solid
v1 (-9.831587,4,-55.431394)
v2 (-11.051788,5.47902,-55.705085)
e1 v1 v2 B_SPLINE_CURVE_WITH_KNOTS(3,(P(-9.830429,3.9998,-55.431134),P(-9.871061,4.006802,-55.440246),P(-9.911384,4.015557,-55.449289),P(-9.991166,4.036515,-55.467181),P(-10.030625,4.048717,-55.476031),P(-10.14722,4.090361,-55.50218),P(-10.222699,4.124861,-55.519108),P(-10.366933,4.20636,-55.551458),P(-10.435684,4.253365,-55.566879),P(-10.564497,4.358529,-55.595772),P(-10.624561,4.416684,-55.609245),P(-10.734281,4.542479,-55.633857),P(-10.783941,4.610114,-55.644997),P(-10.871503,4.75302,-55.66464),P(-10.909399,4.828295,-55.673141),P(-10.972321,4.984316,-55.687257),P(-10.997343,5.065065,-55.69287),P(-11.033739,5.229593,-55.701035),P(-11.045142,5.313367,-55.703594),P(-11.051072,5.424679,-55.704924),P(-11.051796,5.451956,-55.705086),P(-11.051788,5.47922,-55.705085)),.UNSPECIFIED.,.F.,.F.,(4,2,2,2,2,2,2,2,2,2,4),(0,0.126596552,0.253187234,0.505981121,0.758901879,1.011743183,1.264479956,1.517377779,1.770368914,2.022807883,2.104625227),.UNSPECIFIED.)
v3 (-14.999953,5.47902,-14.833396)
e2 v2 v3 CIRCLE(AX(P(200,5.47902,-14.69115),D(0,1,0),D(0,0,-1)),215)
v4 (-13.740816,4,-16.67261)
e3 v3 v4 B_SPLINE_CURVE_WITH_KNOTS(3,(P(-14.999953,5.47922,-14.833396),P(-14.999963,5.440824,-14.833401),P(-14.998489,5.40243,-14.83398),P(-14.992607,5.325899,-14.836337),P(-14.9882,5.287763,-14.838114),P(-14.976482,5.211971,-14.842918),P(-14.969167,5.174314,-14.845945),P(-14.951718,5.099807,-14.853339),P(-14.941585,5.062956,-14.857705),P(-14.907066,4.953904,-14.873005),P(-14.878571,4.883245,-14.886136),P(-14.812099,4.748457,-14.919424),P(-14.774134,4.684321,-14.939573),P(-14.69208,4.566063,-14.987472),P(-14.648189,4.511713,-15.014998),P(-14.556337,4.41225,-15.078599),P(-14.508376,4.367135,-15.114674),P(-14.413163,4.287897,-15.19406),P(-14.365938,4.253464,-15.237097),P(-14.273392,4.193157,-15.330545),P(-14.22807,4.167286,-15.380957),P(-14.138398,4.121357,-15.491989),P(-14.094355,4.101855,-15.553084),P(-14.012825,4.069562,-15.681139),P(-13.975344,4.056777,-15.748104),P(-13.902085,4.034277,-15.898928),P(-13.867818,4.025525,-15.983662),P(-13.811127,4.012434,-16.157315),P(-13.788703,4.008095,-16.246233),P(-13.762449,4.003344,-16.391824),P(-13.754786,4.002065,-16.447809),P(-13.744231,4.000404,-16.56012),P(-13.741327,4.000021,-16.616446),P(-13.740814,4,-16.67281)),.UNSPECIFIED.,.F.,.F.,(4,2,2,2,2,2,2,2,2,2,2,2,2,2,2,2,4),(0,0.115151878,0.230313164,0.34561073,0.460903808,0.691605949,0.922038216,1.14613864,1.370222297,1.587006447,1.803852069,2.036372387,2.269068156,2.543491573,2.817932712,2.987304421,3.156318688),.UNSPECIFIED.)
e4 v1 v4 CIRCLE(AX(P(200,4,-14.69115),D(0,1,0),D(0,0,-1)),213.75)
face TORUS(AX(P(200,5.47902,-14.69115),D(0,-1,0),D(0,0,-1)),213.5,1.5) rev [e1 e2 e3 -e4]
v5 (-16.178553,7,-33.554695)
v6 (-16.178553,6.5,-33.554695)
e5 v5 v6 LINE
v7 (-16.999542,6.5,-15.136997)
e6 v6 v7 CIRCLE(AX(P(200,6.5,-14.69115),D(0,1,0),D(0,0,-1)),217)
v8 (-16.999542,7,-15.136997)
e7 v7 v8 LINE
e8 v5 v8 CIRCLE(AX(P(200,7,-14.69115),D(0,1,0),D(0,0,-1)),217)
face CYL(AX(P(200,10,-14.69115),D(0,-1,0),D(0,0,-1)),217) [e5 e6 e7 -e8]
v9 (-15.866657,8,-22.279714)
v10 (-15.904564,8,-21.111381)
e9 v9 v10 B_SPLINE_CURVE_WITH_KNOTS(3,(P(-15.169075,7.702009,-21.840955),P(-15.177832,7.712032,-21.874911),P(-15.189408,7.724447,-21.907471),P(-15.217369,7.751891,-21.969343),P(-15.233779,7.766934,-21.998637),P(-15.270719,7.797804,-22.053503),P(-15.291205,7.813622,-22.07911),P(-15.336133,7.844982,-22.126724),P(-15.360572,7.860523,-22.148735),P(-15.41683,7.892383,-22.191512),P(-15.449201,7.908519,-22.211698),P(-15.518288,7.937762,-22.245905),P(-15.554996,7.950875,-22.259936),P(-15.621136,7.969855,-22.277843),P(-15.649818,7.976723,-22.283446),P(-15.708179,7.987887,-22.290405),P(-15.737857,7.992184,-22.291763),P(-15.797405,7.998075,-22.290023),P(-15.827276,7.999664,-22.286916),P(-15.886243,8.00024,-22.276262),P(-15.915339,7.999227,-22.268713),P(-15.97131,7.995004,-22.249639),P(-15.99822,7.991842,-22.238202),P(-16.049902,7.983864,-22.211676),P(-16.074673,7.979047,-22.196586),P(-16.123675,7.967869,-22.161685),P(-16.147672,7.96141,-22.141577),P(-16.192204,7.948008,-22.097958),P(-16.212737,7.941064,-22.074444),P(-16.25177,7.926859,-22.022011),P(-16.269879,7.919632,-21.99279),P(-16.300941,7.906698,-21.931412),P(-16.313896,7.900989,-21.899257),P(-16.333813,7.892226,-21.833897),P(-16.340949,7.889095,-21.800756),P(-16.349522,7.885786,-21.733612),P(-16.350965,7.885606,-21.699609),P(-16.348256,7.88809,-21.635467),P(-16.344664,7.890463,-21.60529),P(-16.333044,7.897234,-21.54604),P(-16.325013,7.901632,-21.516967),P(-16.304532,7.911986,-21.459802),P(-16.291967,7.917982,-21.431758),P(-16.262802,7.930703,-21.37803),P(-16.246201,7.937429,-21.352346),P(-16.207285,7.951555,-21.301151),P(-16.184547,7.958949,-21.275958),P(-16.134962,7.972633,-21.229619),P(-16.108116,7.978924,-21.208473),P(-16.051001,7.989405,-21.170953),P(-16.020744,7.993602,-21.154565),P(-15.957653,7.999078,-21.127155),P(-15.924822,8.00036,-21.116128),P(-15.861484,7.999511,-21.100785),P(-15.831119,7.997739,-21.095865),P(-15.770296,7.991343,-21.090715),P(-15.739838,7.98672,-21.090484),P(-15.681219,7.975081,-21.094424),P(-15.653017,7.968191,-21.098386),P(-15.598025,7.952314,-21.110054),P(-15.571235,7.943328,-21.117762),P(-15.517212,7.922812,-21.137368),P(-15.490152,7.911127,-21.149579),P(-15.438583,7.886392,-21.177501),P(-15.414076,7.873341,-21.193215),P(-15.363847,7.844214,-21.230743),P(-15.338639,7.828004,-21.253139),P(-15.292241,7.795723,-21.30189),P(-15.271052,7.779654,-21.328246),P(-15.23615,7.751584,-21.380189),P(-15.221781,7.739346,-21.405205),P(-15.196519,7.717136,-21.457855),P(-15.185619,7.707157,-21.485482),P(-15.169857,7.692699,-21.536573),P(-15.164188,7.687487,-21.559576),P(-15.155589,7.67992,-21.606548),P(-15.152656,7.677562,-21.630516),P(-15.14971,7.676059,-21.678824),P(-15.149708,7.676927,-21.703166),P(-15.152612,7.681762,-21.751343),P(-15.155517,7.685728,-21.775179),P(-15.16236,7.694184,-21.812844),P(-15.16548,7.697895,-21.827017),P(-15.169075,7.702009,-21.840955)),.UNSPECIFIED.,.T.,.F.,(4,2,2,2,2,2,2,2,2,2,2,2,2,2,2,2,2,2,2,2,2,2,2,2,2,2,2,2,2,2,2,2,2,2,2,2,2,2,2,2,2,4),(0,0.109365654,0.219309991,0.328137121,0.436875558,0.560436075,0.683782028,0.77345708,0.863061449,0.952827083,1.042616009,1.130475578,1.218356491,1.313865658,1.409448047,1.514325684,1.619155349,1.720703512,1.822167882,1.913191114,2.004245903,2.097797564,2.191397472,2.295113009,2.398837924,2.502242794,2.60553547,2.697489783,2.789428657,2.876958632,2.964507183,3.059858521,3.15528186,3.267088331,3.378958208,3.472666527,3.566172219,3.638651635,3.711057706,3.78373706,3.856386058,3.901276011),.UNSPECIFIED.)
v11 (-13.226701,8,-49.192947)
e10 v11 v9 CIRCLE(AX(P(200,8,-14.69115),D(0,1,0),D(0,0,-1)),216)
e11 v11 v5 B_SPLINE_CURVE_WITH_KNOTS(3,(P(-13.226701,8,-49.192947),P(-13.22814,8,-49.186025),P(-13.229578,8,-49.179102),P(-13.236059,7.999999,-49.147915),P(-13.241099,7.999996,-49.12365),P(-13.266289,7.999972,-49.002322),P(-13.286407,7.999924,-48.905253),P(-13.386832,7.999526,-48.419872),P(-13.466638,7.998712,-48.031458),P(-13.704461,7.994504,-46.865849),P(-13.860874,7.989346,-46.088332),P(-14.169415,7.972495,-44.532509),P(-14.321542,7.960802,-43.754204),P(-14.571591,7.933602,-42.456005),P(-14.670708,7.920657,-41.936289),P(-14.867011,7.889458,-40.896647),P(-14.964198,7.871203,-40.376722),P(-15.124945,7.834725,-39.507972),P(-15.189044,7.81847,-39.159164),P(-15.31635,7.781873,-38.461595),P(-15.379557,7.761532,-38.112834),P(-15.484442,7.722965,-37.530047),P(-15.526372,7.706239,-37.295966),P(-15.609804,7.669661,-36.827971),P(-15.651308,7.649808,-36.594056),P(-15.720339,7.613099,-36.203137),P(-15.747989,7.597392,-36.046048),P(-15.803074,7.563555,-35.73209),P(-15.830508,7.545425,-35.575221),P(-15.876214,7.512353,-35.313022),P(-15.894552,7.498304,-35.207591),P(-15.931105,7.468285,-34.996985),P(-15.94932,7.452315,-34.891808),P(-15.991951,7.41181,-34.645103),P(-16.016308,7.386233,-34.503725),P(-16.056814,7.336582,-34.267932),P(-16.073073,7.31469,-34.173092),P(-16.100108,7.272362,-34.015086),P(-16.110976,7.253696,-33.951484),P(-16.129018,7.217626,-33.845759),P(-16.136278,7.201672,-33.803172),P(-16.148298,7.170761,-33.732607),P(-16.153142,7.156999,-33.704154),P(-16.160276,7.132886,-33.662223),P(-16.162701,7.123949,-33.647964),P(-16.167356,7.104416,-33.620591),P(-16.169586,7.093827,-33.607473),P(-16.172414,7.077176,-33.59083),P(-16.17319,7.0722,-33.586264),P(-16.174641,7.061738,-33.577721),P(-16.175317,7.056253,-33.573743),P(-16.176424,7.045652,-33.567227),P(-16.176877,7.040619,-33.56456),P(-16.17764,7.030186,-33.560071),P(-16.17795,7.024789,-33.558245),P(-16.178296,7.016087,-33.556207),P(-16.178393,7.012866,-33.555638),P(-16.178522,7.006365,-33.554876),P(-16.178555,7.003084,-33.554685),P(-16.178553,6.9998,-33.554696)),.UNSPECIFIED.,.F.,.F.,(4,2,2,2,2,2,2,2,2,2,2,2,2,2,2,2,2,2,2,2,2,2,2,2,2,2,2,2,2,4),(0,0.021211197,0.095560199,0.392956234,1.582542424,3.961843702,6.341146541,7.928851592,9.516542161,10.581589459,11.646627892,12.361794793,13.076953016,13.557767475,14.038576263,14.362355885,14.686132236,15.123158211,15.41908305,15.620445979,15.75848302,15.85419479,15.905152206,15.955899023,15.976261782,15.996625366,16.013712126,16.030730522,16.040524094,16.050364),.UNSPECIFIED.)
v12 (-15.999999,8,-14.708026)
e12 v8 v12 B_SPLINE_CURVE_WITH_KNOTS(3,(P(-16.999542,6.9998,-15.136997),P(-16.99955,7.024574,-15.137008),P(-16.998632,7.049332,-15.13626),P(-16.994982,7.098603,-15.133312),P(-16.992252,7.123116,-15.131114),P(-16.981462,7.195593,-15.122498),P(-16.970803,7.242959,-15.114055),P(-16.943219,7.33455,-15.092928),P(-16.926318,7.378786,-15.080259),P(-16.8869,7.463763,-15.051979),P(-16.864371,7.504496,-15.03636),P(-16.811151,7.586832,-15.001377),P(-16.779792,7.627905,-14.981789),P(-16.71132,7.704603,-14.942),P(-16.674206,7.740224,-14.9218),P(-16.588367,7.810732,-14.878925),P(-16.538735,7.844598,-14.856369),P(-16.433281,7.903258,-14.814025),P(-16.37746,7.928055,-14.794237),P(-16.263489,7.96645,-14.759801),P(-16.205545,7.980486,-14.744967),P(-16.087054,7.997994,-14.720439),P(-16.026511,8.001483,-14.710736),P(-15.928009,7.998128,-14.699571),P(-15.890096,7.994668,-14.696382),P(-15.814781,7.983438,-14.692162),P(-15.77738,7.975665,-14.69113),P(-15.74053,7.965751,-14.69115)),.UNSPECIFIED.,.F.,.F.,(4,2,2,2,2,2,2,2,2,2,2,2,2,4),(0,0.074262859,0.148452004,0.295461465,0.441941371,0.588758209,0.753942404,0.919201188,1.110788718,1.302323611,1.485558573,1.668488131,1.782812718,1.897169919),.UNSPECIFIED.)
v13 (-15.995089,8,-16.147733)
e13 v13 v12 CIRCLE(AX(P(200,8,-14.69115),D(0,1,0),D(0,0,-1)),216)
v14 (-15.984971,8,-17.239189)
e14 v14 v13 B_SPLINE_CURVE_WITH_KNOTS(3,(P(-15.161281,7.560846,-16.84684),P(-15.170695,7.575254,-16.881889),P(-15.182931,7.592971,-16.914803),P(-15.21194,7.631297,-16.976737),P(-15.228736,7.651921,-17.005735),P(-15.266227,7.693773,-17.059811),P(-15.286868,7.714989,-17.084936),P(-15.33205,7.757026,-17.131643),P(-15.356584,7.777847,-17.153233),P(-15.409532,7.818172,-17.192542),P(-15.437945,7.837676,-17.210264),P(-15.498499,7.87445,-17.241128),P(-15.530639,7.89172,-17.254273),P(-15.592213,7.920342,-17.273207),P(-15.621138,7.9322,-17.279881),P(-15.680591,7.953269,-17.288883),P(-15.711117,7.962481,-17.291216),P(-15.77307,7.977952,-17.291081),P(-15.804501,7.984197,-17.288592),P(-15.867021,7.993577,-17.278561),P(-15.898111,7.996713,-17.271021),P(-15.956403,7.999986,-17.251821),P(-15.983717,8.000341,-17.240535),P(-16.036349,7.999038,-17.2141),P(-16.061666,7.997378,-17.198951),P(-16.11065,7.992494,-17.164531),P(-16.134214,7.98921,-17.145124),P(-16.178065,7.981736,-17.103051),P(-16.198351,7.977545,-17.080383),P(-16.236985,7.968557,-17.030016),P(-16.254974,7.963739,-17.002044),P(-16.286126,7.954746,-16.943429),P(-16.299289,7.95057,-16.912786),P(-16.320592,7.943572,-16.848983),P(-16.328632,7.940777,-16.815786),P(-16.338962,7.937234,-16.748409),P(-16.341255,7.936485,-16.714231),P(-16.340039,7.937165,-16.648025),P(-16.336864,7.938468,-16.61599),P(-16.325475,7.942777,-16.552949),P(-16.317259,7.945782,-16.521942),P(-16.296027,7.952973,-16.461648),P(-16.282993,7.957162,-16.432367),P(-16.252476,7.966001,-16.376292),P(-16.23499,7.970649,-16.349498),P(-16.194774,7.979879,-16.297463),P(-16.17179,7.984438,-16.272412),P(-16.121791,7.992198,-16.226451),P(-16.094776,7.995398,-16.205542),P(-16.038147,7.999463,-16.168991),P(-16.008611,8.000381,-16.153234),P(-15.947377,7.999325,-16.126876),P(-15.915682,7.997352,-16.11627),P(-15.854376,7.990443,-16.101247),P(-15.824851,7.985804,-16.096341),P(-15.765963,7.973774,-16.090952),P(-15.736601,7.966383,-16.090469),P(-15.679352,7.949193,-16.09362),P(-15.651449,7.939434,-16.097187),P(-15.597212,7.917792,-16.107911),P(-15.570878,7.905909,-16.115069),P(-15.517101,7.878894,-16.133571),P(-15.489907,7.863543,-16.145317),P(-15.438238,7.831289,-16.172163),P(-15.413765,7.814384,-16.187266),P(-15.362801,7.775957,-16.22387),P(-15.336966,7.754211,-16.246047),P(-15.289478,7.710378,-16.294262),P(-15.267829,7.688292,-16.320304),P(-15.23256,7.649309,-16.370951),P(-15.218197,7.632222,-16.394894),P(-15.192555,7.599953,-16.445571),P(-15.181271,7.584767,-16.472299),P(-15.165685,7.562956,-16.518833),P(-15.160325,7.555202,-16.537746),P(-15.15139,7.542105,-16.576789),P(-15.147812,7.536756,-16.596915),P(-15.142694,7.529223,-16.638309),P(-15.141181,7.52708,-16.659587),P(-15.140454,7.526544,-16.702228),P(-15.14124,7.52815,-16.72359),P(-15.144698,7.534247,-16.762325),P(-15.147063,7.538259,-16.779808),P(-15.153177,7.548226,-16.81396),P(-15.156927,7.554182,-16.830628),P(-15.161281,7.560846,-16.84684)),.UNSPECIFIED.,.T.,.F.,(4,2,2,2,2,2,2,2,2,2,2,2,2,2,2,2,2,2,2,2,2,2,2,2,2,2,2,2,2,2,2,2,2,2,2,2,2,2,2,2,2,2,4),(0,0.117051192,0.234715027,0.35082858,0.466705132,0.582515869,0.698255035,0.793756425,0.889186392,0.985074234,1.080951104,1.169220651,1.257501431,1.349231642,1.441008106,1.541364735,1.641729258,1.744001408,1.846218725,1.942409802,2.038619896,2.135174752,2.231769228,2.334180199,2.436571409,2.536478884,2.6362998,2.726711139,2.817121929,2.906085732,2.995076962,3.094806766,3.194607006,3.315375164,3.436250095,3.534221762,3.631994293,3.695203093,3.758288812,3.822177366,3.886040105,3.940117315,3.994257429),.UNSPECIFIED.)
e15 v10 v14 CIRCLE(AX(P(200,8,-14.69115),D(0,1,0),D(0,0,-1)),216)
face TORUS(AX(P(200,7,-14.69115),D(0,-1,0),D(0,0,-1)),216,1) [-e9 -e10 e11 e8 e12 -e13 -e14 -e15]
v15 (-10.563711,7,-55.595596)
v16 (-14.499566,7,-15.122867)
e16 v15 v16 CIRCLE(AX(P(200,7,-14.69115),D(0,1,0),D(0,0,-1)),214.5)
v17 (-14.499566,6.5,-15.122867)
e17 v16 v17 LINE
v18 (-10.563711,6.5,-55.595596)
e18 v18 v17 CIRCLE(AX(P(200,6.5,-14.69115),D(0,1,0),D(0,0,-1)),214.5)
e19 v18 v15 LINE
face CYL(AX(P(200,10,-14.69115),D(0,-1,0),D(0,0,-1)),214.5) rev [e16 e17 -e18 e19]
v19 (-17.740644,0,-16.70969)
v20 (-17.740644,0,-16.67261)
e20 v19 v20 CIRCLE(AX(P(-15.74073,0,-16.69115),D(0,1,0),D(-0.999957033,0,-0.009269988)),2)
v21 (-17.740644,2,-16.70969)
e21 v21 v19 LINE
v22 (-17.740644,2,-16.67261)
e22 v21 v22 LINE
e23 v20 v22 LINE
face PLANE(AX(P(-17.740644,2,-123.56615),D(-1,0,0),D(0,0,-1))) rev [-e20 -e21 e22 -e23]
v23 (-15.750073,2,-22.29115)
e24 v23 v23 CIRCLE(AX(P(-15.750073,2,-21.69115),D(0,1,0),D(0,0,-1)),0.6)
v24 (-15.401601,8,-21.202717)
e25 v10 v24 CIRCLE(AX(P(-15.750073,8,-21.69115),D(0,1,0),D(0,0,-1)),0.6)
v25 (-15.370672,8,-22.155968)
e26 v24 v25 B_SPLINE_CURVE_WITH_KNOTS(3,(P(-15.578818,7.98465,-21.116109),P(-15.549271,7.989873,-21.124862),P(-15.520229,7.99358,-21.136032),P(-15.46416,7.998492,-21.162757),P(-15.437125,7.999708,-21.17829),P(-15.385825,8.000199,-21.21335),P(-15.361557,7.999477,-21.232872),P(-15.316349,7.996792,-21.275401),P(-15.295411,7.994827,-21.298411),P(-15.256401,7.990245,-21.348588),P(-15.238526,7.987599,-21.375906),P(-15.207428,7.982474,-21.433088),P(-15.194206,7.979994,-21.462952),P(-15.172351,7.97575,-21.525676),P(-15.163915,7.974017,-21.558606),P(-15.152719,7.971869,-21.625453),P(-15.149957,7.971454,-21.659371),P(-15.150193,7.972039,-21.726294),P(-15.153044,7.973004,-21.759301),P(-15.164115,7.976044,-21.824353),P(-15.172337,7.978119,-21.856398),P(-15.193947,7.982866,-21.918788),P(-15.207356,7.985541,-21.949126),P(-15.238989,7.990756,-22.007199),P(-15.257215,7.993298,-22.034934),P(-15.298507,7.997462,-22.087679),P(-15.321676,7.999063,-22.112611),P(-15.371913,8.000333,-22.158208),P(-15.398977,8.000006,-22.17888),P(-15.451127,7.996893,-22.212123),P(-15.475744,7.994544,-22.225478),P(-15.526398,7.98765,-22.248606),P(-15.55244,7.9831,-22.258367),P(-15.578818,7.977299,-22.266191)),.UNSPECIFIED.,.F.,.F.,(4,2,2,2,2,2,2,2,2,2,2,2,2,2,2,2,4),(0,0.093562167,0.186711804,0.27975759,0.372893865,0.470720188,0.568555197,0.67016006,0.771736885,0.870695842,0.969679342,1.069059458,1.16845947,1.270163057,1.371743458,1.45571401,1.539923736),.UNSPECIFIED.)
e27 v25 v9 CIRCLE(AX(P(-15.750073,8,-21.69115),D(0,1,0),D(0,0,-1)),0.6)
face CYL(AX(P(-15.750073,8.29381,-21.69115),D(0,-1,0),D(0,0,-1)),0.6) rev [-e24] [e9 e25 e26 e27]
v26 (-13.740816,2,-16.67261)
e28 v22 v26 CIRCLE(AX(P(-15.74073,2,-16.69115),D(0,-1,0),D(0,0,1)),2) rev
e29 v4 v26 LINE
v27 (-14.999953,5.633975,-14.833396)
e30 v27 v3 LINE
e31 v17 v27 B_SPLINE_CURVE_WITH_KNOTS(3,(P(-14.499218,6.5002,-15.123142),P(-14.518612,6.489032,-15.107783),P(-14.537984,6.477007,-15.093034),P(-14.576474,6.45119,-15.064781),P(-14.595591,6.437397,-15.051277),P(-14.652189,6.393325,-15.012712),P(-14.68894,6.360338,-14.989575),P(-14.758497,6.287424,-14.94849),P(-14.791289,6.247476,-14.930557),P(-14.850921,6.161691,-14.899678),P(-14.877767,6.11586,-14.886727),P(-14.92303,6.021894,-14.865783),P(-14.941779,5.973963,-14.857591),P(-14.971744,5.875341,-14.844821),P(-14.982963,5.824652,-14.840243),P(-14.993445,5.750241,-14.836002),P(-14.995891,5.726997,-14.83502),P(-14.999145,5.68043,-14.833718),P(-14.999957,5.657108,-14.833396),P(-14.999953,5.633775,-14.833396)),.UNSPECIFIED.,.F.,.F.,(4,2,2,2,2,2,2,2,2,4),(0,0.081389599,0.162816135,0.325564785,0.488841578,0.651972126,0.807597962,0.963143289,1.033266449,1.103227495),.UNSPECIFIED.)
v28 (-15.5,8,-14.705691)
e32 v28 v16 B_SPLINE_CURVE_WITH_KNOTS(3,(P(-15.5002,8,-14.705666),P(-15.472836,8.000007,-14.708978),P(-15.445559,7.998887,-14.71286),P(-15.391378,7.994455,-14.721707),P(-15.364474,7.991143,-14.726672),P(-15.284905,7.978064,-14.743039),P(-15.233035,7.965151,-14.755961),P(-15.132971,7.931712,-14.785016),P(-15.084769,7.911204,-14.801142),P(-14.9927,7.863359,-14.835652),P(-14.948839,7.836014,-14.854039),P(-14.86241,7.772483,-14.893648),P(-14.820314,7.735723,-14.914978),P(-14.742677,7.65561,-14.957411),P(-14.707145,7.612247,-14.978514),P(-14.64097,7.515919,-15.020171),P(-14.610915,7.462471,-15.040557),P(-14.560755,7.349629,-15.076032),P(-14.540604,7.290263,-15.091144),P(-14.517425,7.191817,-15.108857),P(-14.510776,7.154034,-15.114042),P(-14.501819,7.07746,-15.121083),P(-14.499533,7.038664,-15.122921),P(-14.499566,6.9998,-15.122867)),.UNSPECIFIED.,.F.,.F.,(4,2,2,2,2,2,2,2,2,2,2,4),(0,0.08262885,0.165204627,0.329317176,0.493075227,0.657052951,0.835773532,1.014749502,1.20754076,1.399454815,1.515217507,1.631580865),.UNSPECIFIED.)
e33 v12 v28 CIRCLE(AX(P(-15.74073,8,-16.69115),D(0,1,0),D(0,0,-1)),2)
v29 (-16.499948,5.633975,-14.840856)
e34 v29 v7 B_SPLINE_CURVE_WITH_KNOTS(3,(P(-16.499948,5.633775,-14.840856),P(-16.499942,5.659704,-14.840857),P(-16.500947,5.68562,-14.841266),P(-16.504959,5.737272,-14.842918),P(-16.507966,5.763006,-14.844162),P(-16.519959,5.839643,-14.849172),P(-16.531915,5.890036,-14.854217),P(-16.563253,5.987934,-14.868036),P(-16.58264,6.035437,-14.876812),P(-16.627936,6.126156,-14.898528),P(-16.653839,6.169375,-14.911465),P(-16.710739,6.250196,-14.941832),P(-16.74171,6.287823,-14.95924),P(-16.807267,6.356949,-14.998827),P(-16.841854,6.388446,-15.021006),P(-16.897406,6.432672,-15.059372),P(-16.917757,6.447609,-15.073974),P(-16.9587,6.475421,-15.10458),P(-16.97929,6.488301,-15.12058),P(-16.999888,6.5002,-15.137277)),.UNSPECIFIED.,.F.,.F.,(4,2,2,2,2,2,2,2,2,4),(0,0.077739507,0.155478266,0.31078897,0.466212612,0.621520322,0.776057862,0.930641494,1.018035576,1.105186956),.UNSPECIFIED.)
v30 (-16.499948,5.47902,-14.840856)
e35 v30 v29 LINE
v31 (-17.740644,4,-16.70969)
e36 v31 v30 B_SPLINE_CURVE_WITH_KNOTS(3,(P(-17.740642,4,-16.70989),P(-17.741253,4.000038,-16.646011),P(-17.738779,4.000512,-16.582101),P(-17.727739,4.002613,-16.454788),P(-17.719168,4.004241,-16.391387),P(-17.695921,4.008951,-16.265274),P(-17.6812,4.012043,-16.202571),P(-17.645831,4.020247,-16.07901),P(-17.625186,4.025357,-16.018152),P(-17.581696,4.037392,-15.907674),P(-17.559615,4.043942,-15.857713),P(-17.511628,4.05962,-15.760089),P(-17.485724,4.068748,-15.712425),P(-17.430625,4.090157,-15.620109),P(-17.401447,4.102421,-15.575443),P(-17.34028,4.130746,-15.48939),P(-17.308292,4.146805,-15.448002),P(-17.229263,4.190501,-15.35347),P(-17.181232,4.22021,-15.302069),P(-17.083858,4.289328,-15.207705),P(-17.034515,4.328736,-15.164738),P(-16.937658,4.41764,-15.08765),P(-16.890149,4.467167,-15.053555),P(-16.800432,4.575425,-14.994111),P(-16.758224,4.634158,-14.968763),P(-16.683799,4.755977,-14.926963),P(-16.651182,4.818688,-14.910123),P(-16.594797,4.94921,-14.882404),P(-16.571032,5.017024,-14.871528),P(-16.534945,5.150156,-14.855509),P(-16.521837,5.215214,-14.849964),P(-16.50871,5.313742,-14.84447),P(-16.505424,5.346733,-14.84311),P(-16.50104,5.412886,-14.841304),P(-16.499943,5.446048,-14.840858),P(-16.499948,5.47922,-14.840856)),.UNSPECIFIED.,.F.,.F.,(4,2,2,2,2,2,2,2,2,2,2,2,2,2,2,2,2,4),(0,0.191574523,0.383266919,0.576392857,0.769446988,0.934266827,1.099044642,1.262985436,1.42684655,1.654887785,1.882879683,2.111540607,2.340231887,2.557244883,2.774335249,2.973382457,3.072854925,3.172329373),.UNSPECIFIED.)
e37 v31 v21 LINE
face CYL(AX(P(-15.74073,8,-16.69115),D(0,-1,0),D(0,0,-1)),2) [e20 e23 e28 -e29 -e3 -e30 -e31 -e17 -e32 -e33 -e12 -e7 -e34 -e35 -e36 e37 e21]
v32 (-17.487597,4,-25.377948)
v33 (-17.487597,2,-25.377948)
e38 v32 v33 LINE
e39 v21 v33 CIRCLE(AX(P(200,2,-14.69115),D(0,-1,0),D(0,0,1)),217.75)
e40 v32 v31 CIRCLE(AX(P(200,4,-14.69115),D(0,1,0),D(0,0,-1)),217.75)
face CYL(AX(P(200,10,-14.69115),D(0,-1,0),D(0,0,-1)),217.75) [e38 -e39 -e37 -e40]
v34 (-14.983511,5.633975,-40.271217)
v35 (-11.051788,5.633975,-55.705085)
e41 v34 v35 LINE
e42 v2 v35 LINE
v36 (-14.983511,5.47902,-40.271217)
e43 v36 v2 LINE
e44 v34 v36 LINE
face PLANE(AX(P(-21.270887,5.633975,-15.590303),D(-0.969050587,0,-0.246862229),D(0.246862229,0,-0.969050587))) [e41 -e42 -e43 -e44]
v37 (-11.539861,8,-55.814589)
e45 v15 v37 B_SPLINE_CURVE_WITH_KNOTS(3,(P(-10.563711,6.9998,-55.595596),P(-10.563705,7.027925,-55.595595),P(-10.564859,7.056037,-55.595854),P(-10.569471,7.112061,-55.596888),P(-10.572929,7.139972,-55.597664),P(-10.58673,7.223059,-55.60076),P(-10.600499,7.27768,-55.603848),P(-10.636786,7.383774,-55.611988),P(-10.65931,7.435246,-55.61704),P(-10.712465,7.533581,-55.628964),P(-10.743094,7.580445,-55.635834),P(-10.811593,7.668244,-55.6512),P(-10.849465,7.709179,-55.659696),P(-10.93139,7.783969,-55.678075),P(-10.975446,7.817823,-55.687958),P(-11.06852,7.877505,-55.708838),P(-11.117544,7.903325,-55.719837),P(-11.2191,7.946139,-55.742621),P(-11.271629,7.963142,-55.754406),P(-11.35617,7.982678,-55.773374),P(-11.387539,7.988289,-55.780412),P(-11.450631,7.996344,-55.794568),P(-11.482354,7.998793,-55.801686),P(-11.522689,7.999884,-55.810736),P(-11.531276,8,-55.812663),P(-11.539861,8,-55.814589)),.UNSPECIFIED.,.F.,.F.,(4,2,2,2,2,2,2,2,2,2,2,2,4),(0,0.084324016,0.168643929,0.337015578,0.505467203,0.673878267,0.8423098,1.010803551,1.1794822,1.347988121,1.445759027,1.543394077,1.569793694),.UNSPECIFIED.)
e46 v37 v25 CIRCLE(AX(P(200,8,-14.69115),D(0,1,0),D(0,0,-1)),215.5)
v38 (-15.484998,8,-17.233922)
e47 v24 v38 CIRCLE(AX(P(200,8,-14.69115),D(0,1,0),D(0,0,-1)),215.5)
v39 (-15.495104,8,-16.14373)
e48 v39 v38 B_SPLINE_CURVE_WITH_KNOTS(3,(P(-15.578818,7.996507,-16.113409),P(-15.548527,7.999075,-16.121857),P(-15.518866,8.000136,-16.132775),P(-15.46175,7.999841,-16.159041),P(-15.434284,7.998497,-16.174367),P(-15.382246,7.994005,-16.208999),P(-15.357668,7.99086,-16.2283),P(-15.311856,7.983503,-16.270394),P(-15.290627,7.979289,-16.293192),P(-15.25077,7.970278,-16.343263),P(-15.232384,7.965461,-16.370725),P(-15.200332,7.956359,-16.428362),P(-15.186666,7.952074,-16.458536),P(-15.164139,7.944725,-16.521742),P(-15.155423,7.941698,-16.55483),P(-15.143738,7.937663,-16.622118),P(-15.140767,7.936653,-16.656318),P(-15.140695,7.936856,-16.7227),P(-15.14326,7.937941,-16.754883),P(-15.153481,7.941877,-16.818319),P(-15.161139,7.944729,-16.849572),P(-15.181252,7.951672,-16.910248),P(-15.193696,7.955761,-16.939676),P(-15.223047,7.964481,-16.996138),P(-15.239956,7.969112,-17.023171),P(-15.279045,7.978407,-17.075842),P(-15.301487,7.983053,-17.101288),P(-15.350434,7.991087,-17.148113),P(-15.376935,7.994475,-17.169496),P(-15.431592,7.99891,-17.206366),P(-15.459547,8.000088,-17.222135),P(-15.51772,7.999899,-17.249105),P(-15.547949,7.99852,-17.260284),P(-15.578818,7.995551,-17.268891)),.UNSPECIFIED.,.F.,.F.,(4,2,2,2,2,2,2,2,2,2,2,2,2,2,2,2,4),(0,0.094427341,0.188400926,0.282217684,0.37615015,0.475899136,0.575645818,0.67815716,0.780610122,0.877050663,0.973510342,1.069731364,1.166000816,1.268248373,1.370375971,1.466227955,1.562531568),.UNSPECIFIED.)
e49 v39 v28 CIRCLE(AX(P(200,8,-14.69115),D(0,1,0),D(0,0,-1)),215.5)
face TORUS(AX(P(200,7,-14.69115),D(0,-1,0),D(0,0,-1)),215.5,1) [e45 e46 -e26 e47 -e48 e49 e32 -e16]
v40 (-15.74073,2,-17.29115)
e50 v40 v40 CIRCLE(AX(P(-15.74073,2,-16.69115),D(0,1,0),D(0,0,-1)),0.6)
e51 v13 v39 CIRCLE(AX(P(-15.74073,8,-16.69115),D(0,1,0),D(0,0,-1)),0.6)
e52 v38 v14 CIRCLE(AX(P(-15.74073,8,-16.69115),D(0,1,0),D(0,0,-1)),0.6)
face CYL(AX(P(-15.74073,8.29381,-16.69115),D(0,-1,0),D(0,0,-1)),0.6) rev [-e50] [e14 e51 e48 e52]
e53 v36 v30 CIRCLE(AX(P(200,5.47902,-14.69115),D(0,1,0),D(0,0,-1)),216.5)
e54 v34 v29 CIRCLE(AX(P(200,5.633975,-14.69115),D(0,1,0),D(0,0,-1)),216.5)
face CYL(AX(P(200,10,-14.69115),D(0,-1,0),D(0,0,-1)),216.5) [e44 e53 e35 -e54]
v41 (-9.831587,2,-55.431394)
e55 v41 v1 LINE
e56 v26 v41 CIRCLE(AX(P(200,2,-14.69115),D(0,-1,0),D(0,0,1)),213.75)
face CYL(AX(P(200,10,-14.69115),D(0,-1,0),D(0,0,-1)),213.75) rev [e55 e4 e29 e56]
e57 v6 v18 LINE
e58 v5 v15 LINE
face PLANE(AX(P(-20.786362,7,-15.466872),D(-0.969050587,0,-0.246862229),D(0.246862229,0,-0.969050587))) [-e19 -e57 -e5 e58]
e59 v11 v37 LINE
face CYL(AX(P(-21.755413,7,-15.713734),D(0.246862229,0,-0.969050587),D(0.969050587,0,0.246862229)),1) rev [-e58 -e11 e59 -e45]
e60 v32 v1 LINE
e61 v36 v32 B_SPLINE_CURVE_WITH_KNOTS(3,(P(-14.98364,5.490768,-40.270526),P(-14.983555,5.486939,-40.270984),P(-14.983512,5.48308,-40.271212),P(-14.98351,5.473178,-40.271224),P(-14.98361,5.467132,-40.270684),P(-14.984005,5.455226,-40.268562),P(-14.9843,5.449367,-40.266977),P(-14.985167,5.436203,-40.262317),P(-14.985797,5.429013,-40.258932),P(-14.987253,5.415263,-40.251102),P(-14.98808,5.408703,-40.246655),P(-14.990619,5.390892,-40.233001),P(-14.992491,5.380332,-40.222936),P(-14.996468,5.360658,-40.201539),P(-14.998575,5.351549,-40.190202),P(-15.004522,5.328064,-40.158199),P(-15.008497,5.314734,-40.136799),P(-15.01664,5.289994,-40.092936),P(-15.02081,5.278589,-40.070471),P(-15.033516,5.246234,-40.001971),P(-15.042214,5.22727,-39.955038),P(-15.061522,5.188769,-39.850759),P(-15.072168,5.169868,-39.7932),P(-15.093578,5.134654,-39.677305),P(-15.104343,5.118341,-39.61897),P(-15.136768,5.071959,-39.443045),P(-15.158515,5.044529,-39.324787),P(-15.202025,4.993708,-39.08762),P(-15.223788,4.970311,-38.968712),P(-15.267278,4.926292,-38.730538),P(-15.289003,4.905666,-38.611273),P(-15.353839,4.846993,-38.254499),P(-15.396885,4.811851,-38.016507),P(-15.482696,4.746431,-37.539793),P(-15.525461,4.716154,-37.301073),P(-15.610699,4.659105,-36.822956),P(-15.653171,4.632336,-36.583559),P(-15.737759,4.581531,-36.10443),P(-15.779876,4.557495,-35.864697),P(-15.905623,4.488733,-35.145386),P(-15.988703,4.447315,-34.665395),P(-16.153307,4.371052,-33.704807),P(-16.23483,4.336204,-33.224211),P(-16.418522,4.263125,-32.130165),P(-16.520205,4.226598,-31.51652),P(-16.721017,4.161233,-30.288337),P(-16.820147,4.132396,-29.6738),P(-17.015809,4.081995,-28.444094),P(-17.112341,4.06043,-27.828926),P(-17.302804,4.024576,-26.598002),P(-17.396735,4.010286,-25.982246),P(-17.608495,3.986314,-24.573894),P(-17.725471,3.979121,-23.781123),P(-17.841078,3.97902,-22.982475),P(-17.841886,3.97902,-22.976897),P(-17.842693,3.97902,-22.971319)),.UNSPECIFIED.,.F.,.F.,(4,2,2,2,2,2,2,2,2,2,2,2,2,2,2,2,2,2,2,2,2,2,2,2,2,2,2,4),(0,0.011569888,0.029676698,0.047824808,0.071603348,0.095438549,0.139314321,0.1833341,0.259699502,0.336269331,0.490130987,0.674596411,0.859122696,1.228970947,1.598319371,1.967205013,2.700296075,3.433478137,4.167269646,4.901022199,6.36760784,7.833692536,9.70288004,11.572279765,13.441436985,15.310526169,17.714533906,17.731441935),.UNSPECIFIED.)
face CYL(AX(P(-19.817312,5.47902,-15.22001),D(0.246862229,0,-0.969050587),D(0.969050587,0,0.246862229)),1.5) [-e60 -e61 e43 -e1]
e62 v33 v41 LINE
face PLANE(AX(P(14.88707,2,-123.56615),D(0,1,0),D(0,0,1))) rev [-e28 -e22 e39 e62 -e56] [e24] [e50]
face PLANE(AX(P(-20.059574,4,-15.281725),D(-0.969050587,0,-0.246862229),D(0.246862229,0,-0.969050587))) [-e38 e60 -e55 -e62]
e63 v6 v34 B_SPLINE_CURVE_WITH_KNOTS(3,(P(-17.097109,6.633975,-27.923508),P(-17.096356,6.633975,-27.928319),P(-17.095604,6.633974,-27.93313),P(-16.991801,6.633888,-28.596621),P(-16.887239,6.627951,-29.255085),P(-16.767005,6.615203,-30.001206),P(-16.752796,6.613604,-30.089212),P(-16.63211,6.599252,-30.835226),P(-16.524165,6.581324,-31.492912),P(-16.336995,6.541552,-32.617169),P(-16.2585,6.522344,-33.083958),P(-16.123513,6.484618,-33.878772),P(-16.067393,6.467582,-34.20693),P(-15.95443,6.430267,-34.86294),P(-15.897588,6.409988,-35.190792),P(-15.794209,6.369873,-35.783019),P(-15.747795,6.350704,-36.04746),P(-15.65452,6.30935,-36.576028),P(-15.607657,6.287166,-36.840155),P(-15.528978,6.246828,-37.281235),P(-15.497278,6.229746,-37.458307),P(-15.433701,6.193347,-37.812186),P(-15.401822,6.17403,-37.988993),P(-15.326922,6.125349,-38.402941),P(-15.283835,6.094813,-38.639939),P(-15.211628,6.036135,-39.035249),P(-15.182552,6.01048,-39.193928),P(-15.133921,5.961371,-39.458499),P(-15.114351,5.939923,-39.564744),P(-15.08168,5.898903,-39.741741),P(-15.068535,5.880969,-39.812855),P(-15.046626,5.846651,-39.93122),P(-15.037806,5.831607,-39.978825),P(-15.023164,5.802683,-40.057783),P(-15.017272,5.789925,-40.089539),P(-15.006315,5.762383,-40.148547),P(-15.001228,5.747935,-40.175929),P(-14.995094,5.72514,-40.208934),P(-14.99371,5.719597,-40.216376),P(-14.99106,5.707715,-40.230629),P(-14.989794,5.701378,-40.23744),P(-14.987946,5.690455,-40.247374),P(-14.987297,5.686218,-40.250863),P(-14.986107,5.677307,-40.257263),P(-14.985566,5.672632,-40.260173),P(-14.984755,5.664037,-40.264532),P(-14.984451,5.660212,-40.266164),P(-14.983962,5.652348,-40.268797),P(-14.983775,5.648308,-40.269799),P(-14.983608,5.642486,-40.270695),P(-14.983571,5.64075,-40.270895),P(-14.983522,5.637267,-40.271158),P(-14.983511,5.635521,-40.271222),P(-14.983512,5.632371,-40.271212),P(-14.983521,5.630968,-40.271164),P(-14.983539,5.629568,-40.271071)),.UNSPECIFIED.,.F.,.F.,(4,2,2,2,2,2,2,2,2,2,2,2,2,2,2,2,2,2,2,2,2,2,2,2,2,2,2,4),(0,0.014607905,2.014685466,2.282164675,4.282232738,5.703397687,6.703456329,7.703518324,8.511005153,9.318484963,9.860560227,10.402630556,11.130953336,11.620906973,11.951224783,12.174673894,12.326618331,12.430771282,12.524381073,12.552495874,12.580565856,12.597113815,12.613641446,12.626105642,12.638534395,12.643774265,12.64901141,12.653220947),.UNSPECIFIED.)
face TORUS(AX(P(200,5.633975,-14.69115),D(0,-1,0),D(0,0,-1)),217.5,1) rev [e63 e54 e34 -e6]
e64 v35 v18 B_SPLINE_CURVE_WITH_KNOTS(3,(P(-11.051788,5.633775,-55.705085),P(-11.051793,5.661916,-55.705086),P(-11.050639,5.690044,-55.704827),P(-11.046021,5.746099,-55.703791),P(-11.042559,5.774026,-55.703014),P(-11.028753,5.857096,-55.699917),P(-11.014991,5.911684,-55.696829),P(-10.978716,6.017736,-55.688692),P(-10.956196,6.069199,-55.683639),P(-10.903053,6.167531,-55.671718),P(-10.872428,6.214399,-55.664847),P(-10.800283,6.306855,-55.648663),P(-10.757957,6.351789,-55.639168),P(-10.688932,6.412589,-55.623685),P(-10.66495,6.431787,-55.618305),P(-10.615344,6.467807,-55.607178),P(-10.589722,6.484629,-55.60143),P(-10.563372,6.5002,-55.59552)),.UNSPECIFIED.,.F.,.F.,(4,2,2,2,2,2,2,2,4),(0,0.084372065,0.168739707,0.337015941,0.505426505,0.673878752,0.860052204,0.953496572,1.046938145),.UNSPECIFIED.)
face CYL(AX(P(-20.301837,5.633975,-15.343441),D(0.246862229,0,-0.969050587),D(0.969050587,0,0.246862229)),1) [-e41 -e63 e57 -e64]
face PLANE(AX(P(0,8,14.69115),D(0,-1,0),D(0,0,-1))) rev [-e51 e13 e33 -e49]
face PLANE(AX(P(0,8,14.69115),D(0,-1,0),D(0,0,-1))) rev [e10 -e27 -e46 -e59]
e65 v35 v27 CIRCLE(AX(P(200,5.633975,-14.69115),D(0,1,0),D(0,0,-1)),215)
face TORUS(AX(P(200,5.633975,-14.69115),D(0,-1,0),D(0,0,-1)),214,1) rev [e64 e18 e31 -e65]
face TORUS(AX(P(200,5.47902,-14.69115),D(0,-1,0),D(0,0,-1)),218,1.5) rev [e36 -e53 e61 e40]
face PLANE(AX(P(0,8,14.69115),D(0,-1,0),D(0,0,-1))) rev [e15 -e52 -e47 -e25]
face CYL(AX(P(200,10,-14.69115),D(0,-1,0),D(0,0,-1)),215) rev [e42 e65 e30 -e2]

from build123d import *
from OCP.BRepAlgoAPI import BRepAlgoAPI_Cut
from OCP.TopTools import TopTools_ListOfShape

# Parameters (mm, degrees)
SKETCH_1_W                = 4
SKETCH_1_H                = 21.3823
SKETCH_1_H_2              = 8
EXTRUDE_1_DEPTH           = 4
SKETCH_1_7_W              = 44.5
SKETCH_1_7_H              = 8
EXTRUDE_2_DEPTH           = 3.5
SKETCH_2_W                = 18.5
SKETCH_2_H                = 1.5
CUT_EXTRUDE_1_DEPTH       = 38.072659107
SKETCH_2_3_W              = 2.5
SKETCH_2_3_H              = 1.5
EXTRUDE_4_DEPTH           = 29.3823
FILLET_1_R                = 1
FILLET_2_R                = 1.5
FILLET_3_R                = 1
REVOLVE_2_ANGLE           = 30
CUT_EXTRUDE_5_DEPTH       = 112.412872349
CUT_EXTRUDE_START         = -9
CUT_EXTRUDE_6_DEPTH       = 10
SKETCH_9_W                = 32.627713819
SKETCH_9_H                = 2
CUT_EXTRUDE_7_DEPTH       = 126.089275919
CUT_EXTRUDE_8_DEPTH       = 126.089275919
CUT_EXTRUDE_START_2       = -49.267691206
CUT_EXTRUDE_9_DEPTH       = 49.267691206
SKETCH_16_R               = 0.6
CUT_EXTRUDE_10_DEPTH      = 69.120571654
SKETCH_18_R               = 0.6
CUT_EXTRUDE_11_DEPTH      = 69.120571654
CUT_EXTRUDE_12_DEPTH      = 69.325780514
CUT_EXTRUDE_13_DEPTH      = 65.449078785
CUT_EXTRUDE_14_DEPTH      = 45.022808236
CUT_EXTRUDE_14_DEPTH_BACK = 45.022808236
SKETCH_21_W               = 59.665391343
SKETCH_21_H               = 19.859042977
CUT_EXTRUDE_15_DEPTH      = 60.110082836


with BuildPart() as part:
    # 草图1 → 凸台-拉伸1 (new body)
    with BuildSketch(Plane(origin=(0, 0, 0), x_dir=(1, 0, 0), z_dir=(0, 1, 0))):
        with Locations((-15.75, -4)):
            Rectangle(SKETCH_1_W, SKETCH_1_H)
        with Locations((15.75, -4)):
            Rectangle(SKETCH_1_W, SKETCH_1_H)
        with Locations((15.75, 10.69115)):
            Rectangle(SKETCH_1_W, SKETCH_1_H_2)
        with Locations((-15.75, 10.69115)):
            Rectangle(SKETCH_1_W, SKETCH_1_H_2)
    extrude(amount=EXTRUDE_1_DEPTH)

    # 草图1<7> → 凸台-拉伸2 (add)
    with BuildSketch(Plane(origin=(0, 0, 0), x_dir=(1, 0, 0), z_dir=(0, 1, 0))):
        with Locations((0, 10.69115)):
            Rectangle(SKETCH_1_7_W, SKETCH_1_7_H)
    extrude(amount=EXTRUDE_2_DEPTH)

    # 草图2 → 切除-拉伸1 (cut, through all)
    with BuildSketch(Plane(origin=(0, 0, -14.69115), x_dir=(-1, 0, 0), z_dir=(0, 0, -1))):
        with Locations((0, 2.75)):
            Rectangle(SKETCH_2_W, SKETCH_2_H)
        Polygon((13.25, 3.5), (9.25, 3.5), (9.25, 2), align=None)
        Polygon((-9.25, 3.5), (-13.25, 3.5), (-9.25, 2), align=None)
        Polygon((-22.25, 3.5), (-22.25, 2), (-18.25, 3.5), align=None)
        Polygon((22.25, 3.5), (18.25, 3.5), (22.25, 2), align=None)
    extrude(amount=-CUT_EXTRUDE_1_DEPTH, mode=Mode.SUBTRACT)

    # 草图2<3> → 凸台-拉伸4 (add, through all)
    with BuildSketch(Plane(origin=(0, 0, -14.69115), x_dir=(-1, 0, 0), z_dir=(0, 0, -1))):
        with Locations((-15.75, 7.25)):
            Rectangle(SKETCH_2_3_W, SKETCH_2_3_H)
        Polygon((-15, 6.5), (-16.5, 6.5), (-16.5, 4), (-15.75, 4), (-15, 4), align=None)
        with Locations((15.75, 7.25)):
            Rectangle(SKETCH_2_3_W, SKETCH_2_3_H)
        Polygon((16.5, 6.5), (15, 6.5), (15, 4), (15.75, 4), (16.5, 4), align=None)
    extrude(amount=-EXTRUDE_4_DEPTH)

    # 圆角1
    # the kernel refuses this fillet: 1 mm, written as the material it adds along each edge
    with BuildSketch(Plane(origin=(-16.5, 6.5, -14.69115), x_dir=(-1, 0, 0), z_dir=(0, 0, 1)), Plane(origin=(15, 6.5, -14.69115), x_dir=(-1, 0, 0), z_dir=(0, 0, 1))) as fillet_1_piece_1:
        with BuildLine():
            CenterArc((1, 0.866025404), FILLET_1_R, 180, 60)
            Line((0, 0.866025404), (-0.02, 0.866025404))
            Line((-0.02, 0.866025404), (-0.02, 0))
            Line((-0.02, 0), (0, -0.02))
            ThreePointArc((0, -0.02), (0.25, -0.02), (0.49, -0.017320508))
            Line((0.49, -0.017320508), (0.5, 0))
        make_face()
    extrude(amount=29.3823)
    with BuildSketch(Plane(origin=(-15, 6.5, -14.69115), x_dir=(0, -1, 0), z_dir=(0, 0, 1)), Plane(origin=(16.5, 6.5, -14.69115), x_dir=(0, -1, 0), z_dir=(0, 0, 1))) as fillet_1_piece_2:
        with BuildLine():
            CenterArc((0.866025404, 1), FILLET_1_R, 210, 60)
            Line((0, 0.5), (-0.017320508, 0.49))
            ThreePointArc((-0.017320508, 0.49), (-0.02, 0.25), (-0.02, 0))
            Line((-0.02, 0), (0, -0.02))
            Line((0, -0.02), (0.866025404, -0.02))
            Line((0.866025404, -0.02), (0.866025404, 0))
        make_face()
    extrude(amount=29.3823)

    # 圆角2
    # the kernel refuses this fillet: 1.5 mm, written as the material it adds along each edge
    with BuildSketch(Plane(origin=(16.5, 4, -14.69115), x_dir=(1, 0, 0), z_dir=(0, 0, 1))) as fillet_2_piece_1:
        with BuildLine():
            CenterArc((1.5, 1.479019946), FILLET_2_R, 180, 80.405931773)
            Line((0, 1.479019946), (-0.03, 1.479019946))
            Line((-0.03, 1.479019946), (-0.03, 0))
            Line((-0.03, 0), (0, -0.03))
            ThreePointArc((0, -0.03), (0.625, -0.03), (1.245, -0.029580399))
            Line((1.245, -0.029580399), (1.25, 0))
        make_face()
    extrude(amount=29.3823)
    with BuildSketch(Plane(origin=(15, 4, -14.69115), x_dir=(0, 1, 0), z_dir=(0, 0, 1)), Plane(origin=(-16.5, 4, -14.69115), x_dir=(0, 1, 0), z_dir=(0, 0, 1))) as fillet_2_piece_2:
        with BuildLine():
            CenterArc((1.479019946, 1.5), FILLET_2_R, 189.594068227, 80.405931773)
            Line((0, 1.25), (-0.029580399, 1.245))
            ThreePointArc((-0.029580399, 1.245), (-0.03, 0.625), (-0.03, 0))
            Line((-0.03, 0), (0, -0.03))
            Line((0, -0.03), (1.479019946, -0.03))
            Line((1.479019946, -0.03), (1.479019946, 0))
        make_face()
    extrude(amount=29.3823)
    with BuildSketch(Plane(origin=(-15, 4, -14.69115), x_dir=(0, 1, 0), z_dir=(0, 0, 1))) as fillet_2_piece_3:
        with BuildLine():
            CenterArc((1.479019946, -1.5), FILLET_2_R, 90, 80.405931773)
            Line((0, -1.25), (-0.029580399, -1.245))
            ThreePointArc((-0.029580399, -1.245), (-0.03, -0.625), (-0.03, 0))
            Line((-0.03, 0), (0, 0.03))
            Line((0, 0.03), (1.479019946, 0.03))
            Line((1.479019946, 0.03), (1.479019946, 0))
        make_face()
    extrude(amount=29.3823)

    # 圆角3
    fillet_3_edges = [part.edges().sort_by_distance(p)[0] for p in [
        (14.5, 8, 0),
        (17, 8, 0),
        (-17, 8, 0),
        (-14.5, 8, 0),
    ]]
    fillet(fillet_3_edges, radius=FILLET_3_R)

    # 草图7 → 旋转2 (revolve)
    with BuildSketch(Plane(origin=(0, 0, -14.69115), x_dir=(-1, 0, 0), z_dir=(0, 0, -1))):
        with BuildLine():
            Line((-17.75, 4), (-17.75, 3.5))
            Line((-17.75, 3.5), (-17.75, 0))
            Line((-17.75, 0), (-13.75, 0))
            Line((-13.75, 0), (-13.75, 3.5))
            Line((-13.75, 3.5), (-13.75, 4))
            ThreePointArc((-13.75, 4), (-14.645643924, 4.510774109), (-15, 5.479019946))
            Line((-15, 5.479019946), (-15, 5.633974596))
            ThreePointArc((-15, 5.633974596), (-14.866025404, 6.133974596), (-14.5, 6.5))
            Line((-14.5, 6.5), (-14.5, 7))
            ThreePointArc((-14.5, 7), (-14.792893219, 7.707106781), (-15.5, 8))
            Line((-15.5, 8), (-16, 8))
            ThreePointArc((-16, 8), (-16.707106781, 7.707106781), (-17, 7))
            Line((-17, 7), (-17, 6.5))
            ThreePointArc((-17, 6.5), (-16.633974596, 6.133974596), (-16.5, 5.633974596))
            Line((-16.5, 5.633974596), (-16.5, 5.479019946))
            ThreePointArc((-16.5, 5.479019946), (-16.854356076, 4.510774109), (-17.75, 4))
        make_face()
    revolve(axis=Axis((-200, 10, -14.69115), (0, 1, 0)), revolution_arc=REVOLVE_2_ANGLE)

    # 草图5 → 切除-拉伸5 (cut, through all)
    with BuildSketch(Plane(origin=(0, 0, -14.69115), x_dir=(-1, 0, 0), z_dir=(0, 0, -1))):
        with BuildLine():
            Line((17, 6.5), (17, 7))
            ThreePointArc((17, 7), (16.707106781, 7.707106781), (16, 8))
            Line((16, 8), (15.5, 8))
            ThreePointArc((15.5, 8), (14.792893219, 7.707106781), (14.5, 7))
            Line((14.5, 7), (14.5, 6.5))
            ThreePointArc((14.5, 6.5), (14.866025404, 6.133974596), (15, 5.633974596))
            Line((15, 5.633974596), (15, 5.479019946))
            ThreePointArc((15, 5.479019946), (14.645643924, 4.510774109), (13.75, 4))
            Line((13.75, 4), (13.75, 3.5))
            Line((13.75, 3.5), (13.25, 3.5))
            Line((13.25, 3.5), (9.25, 2))
            Line((9.25, 2), (-9.25, 2))
            Line((-9.25, 2), (-13.25, 3.5))
            Line((-13.25, 3.5), (-13.75, 3.5))
            Line((-13.75, 3.5), (-13.75, 4))
            ThreePointArc((-13.75, 4), (-14.645643924, 4.510774109), (-15, 5.479019946))
            Line((-15, 5.479019946), (-15, 5.633974596))
            ThreePointArc((-15, 5.633974596), (-14.866025404, 6.133974596), (-14.5, 6.5))
            Line((-14.5, 6.5), (-14.5, 7))
            ThreePointArc((-14.5, 7), (-14.792893219, 7.707106781), (-15.5, 8))
            Line((-15.5, 8), (-16, 8))
            ThreePointArc((-16, 8), (-16.707106781, 7.707106781), (-17, 7))
            Line((-17, 7), (-17, 6.5))
            ThreePointArc((-17, 6.5), (-16.633974596, 6.133974596), (-16.5, 5.633974596))
            Line((-16.5, 5.633974596), (-16.5, 5.479019946))
            ThreePointArc((-16.5, 5.479019946), (-16.854356076, 4.510774109), (-17.75, 4))
            Line((-17.75, 4), (-17.75, 3.5))
            Line((-17.75, 3.5), (-18.25, 3.5))
            Line((-18.25, 3.5), (-22.25, 2))
            Line((-22.25, 2), (-22.25, 0))
            Line((-22.25, 0), (22.25, 0))
            Line((22.25, 0), (22.25, 2))
            Line((22.25, 2), (18.25, 3.5))
            Line((18.25, 3.5), (17.75, 3.5))
            Line((17.75, 3.5), (17.75, 4))
            ThreePointArc((17.75, 4), (16.854356076, 4.510774109), (16.5, 5.479019946))
            Line((16.5, 5.479019946), (16.5, 5.633974596))
            ThreePointArc((16.5, 5.633974596), (16.633974596, 6.133974596), (17, 6.5))
        make_face()
    extrude(amount=-CUT_EXTRUDE_5_DEPTH, mode=Mode.SUBTRACT)

    # 切除-拉伸6: read off the stored shape, not the designer's step
    # 切除-拉伸6 outline → 切除-拉伸6 (cut)
    with BuildSketch(Plane.XZ.offset(CUT_EXTRUDE_START)):
        with BuildLine():
            Line((15.740729812, -14.69115), (13.75, -14.69115))
            ThreePointArc((13.75, -14.69115), (13.747703924, -15.681890654), (13.740815747, -16.672610023))
            ThreePointArc((13.740815747, -16.672610023), (14.333086384, -15.270396687), (15.740729812, -14.69115))
        make_face()
        with BuildLine():
            ThreePointArc((17.740643878, -16.709689977), (17.747660957, -15.70043083), (17.75, -14.69115))
            Line((17.75, -14.69115), (15.740729812, -14.69115))
            ThreePointArc((15.740729812, -14.69115), (17.161483126, -15.283506571), (17.740643878, -16.709689977))
        make_face()
    extrude(amount=CUT_EXTRUDE_6_DEPTH, mode=Mode.SUBTRACT)

    # 草图9 → 切除-拉伸7 (cut, through all)
    with BuildSketch(Plane.XY):
        with Locations((1.426786968, 1)):
            Rectangle(SKETCH_9_W, SKETCH_9_H)
    extrude(amount=-CUT_EXTRUDE_7_DEPTH, mode=Mode.SUBTRACT)

    # 草图13 → 切除-拉伸8 (cut, through all)
    with BuildSketch(Plane(origin=(0, 8, 0), x_dir=(1, 0, 0), z_dir=(0, 1, 0))):
        Polygon((16.010534911, 67.272147588), (-7.329315732, 60.975271536), (-25.509234379, 137.795453838), (-4.693944012, 144.014875523), align=None)
    extrude(amount=-CUT_EXTRUDE_8_DEPTH, mode=Mode.SUBTRACT)


with BuildPart() as cut_extrude_9_tool:
    # 切除-拉伸9: read off the stored shape, not the designer's step
    # 切除-拉伸9 outline → 切除-拉伸9 (new body)
    with BuildSketch(Plane(origin=(-15.831701273, 0, -58.681406476), x_dir=(-0.9654799025758982, 0, 0.26047755704097475), z_dir=(-0.2604775570409747, 0, -0.9654799025758981)).offset(CUT_EXTRUDE_START_2)):
        with BuildLine():
            add(Edge.make_bspline(
                [(-26.160537299, 7.999998424), (-26.121993875, 7.999997186), (-26.08345031, 7.997770563), (-25.989275294, 7.986839423), (-25.933934895, 7.975627276), (-25.825922284, 7.944070731), (-25.773250062, 7.923726363), (-25.672071361, 7.874483013), (-25.623564731, 7.845584343), (-25.532095564, 7.780052945), (-25.489132751, 7.743420606), (-25.409984814, 7.66347655), (-25.373797132, 7.620167366), (-25.309197596, 7.528069909), (-25.280788196, 7.479279913), (-25.232562577, 7.377616897), (-25.212748824, 7.324742709), (-25.182312299, 7.216458966), (-25.171675504, 7.161053415), (-25.163907361, 7.087699297), (-25.162517019, 7.07013274), (-25.160671327, 7.035046347), (-25.160210933, 7.017526777), (-25.160209944, 7)],
                knots=[1.569539872, 1.569539872, 1.569539872, 1.569539872, 1.685033124, 1.685033124, 1.853625994, 1.853625994, 2.022218312, 2.022218312, 2.190804502, 2.190804502, 2.35938225, 2.35938225, 2.527896204, 2.527896204, 2.696463261, 2.696463261, 2.865078641, 2.865078641, 3.033435924, 3.033435924, 3.086283215, 3.086283215, 3.138843098, 3.138843098, 3.138843098, 3.138843098], degree=3))
            Line((-26.160537299, 7.999998424), (-26.660699845, 7.999998424))
            add(Edge.make_bspline(
                [(-27.661022687, 7), (-27.661022504, 7.028060696), (-27.659840464, 7.056108011), (-27.655119198, 7.112069239), (-27.651574493, 7.13998269), (-27.637429693, 7.223075643), (-27.623318842, 7.277699168), (-27.586127728, 7.383799255), (-27.563043332, 7.435274354), (-27.508564404, 7.533616697), (-27.477171485, 7.580484832), (-27.40696018, 7.668293154), (-27.368140579, 7.709232369), (-27.284175022, 7.784021722), (-27.239028096, 7.817870771), (-27.143681646, 7.877519888), (-27.09348081, 7.903317859), (-26.989464676, 7.946120801), (-26.935649604, 7.963126319), (-26.825911939, 7.987869077), (-26.769988702, 7.995603462), (-26.696125362, 7.999529581), (-26.678412618, 7.999998993), (-26.660699845, 7.999998424)],
                knots=[0.000199877, 0.000199877, 0.000199877, 0.000199877, 0.084330442, 0.084330442, 0.168656793, 0.168656793, 0.337038708, 0.337038708, 0.505498265, 0.505498265, 0.673925161, 0.673925161, 0.842379637, 0.842379637, 1.010859962, 1.010859962, 1.179384125, 1.179384125, 1.347897796, 1.347897796, 1.516463342, 1.516463342, 1.569538693, 1.569538693, 1.569538693, 1.569538693], degree=3))
            Line((-27.661022687, 7), (-27.661022693, 6.499999993))
            add(Edge.make_bspline(
                [(-27.16086164, 5.633974596), (-27.160861719, 5.662050942), (-27.162045141, 5.690114022), (-27.166771795, 5.746106343), (-27.170320501, 5.774035122), (-27.1844702, 5.857111045), (-27.198574914, 5.911702521), (-27.235753479, 6.017762657), (-27.258834489, 6.069228786), (-27.313302438, 6.167567636), (-27.344691408, 6.214439228), (-27.418624307, 6.306887494), (-27.461993001, 6.351812519), (-27.532718296, 6.412602472), (-27.557291177, 6.431796511), (-27.608009033, 6.467733873), (-27.634146776, 6.4844874), (-27.661022693, 6.499999993)],
                knots=[0.000199878, 0.000199878, 0.000199878, 0.000199878, 0.084377582, 0.084377582, 0.168750756, 0.168750756, 0.337038792, 0.337038792, 0.505461316, 0.505461316, 0.673925056, 0.673925056, 0.860061179, 0.860061179, 0.953486913, 0.953486913, 1.046510009, 1.046510009, 1.046510009, 1.046510009], degree=3))
            Line((-27.16086164, 5.633974596), (-27.160861604, 5.479019946))
            add(Edge.make_bspline(
                [(-28.411262876, 4.000000008), (-28.370029739, 4.006967758), (-28.329107236, 4.015655942), (-28.247742777, 4.036513194), (-28.207309134, 4.048714692), (-28.08783509, 4.090355468), (-28.01049231, 4.124852896), (-27.862697557, 4.206343779), (-27.792249049, 4.253343477), (-27.660255752, 4.358494936), (-27.598708182, 4.416643203), (-27.486273953, 4.542424711), (-27.435383523, 4.610054584), (-27.345650214, 4.752947949), (-27.306815033, 4.82821628), (-27.242326505, 4.984230444), (-27.216679212, 5.064978773), (-27.179372025, 5.229507916), (-27.167681742, 5.313281729), (-27.161600474, 5.424556515), (-27.160856812, 5.45179501), (-27.160861604, 5.479019946)],
                knots=[0.001202493, 0.001202493, 0.001202493, 0.001202493, 0.126579738, 0.126579738, 0.253153562, 0.253153562, 0.505912912, 0.505912912, 0.758798687, 0.758798687, 1.011605313, 1.011605313, 1.264322315, 1.264322315, 1.517200369, 1.517200369, 1.770194383, 1.770194383, 2.022636532, 2.022636532, 2.104337931, 2.104337931, 2.104337931, 2.104337931], degree=3))
            Line((-28.411262876, 4.000000008), (-28.411262874, 2))
            Line((-28.411262874, 2), (-24.409962397, 2))
            Line((-24.409962397, 2), (-24.409962432, 3.999999793))
            add(Edge.make_bspline(
                [(-25.660373995, 5.479019946), (-25.660373719, 5.436896809), (-25.658597943, 5.394793793), (-25.651508031, 5.310821743), (-25.64618847, 5.268953166), (-25.62496338, 5.144314582), (-25.60379133, 5.062378933), (-25.547992013, 4.903226755), (-25.513358134, 4.826012566), (-25.431628729, 4.678505956), (-25.384537026, 4.608211422), (-25.279228051, 4.476526079), (-25.221010995, 4.415135097), (-25.09505817, 4.302954312), (-25.027316357, 4.25217129), (-24.88420556, 4.16264898), (-24.808828423, 4.123922751), (-24.652758935, 4.059753969), (-24.572078475, 4.03428277), (-24.463411816, 4.009776554), (-24.436742509, 4.004520241), (-24.409962432, 3.999999793)],
                knots=[0.000199877, 0.000199877, 0.000199877, 0.000199877, 0.126491847, 0.126491847, 0.252977568, 0.252977568, 0.505555719, 0.505555719, 0.758258082, 0.758258082, 1.010883018, 1.010883018, 1.26350304, 1.26350304, 1.5162841, 1.5162841, 1.769337996, 1.769337996, 2.021842694, 2.021842694, 2.103344969, 2.103344969, 2.103344969, 2.103344969], degree=3))
            Line((-25.660373995, 5.479019946), (-25.660373993, 5.633974596))
            add(Edge.make_bspline(
                [(-25.160209932, 6.499999999), (-25.184478281, 6.485993166), (-25.208146504, 6.470972866), (-25.254248925, 6.438925903), (-25.276676785, 6.421890121), (-25.341595174, 6.368101172), (-25.381853024, 6.3285898), (-25.455178844, 6.243354254), (-25.488240954, 6.197625066), (-25.546228596, 6.101264036), (-25.571152285, 6.050631086), (-25.614267852, 5.940412104), (-25.631494656, 5.880441993), (-25.648794147, 5.788871232), (-25.653137268, 5.75801754), (-25.65892374, 5.696106747), (-25.660373351, 5.66505023), (-25.660373993, 5.633974596)],
                knots=[0.000399994, 0.000399994, 0.000399994, 0.000399994, 0.084410261, 0.084410261, 0.16881631, 0.16881631, 0.337175076, 0.337175076, 0.505670414, 0.505670414, 0.674203874, 0.674203874, 0.860199571, 0.860199571, 0.953556827, 0.953556827, 1.046711929, 1.046711929, 1.046711929, 1.046711929], degree=3))
            Line((-25.160209932, 6.499999999), (-25.160209944, 7))
        make_face()
    extrude(amount=CUT_EXTRUDE_9_DEPTH)


with BuildPart() as part_1:
    add(part.part)

    # 切除-拉伸9: cut by cut_extrude_9_tool, with a tolerance
    cut_extrude_9_stock = TopTools_ListOfShape()
    cut_extrude_9_stock.Append(part_1.part.wrapped)
    cut_extrude_9_tools = TopTools_ListOfShape()
    cut_extrude_9_tools.Append(cut_extrude_9_tool.part.wrapped)
    cut_extrude_9_cut = BRepAlgoAPI_Cut()
    cut_extrude_9_cut.SetArguments(cut_extrude_9_stock)
    cut_extrude_9_cut.SetTools(cut_extrude_9_tools)
    cut_extrude_9_cut.SetFuzzyValue(0.00001)
    cut_extrude_9_cut.Build()
    add(Compound.cast(cut_extrude_9_cut.Shape()).solids(), mode=Mode.REPLACE)

    # 草图16 → 切除-拉伸10 (cut, through all)
    with BuildSketch(Plane(origin=(0, 2, 0), x_dir=(-1, 0, 0), z_dir=(0, -1, 0))):
        with Locations(Location((-15.740729812, 16.69115, 0), (0, 0, 90))):
            Circle(SKETCH_16_R)
    extrude(amount=-CUT_EXTRUDE_10_DEPTH, mode=Mode.SUBTRACT)

    # 草图18 → 切除-拉伸11 (cut, through all)
    with BuildSketch(Plane(origin=(0, 2, 0), x_dir=(-1, 0, 0), z_dir=(0, -1, 0))):
        with Locations(Location((-15.750072705, 21.69115, 0), (0, 0, 90))):
            Circle(SKETCH_18_R)
    extrude(amount=-CUT_EXTRUDE_11_DEPTH, mode=Mode.SUBTRACT)

    # 草图19 → 切除-拉伸12 (cut, through all)
    with BuildSketch(Plane(origin=(0, 8, 0), x_dir=(1, 0, 0), z_dir=(0, 1, 0))):
        Polygon((9.42577173, 65.495639323), (10.519777469, 61.440623732), (7.474418334, 60.619013975), (6.380412595, 64.674029566), align=None)
    extrude(amount=-CUT_EXTRUDE_12_DEPTH, mode=Mode.SUBTRACT)

    # 草图20 → 切除-拉伸13 (cut, through all)
    with BuildSketch(Plane(origin=(0, 8, 0), x_dir=(1, 0, 0), z_dir=(0, 1, 0))):
        Polygon((5.321922206, 54.282572393), (14.884942443, 56.718718169), (11.824728013, 71.430358659), (2.577892141, 69.094191063), align=None)
    extrude(amount=-CUT_EXTRUDE_13_DEPTH, mode=Mode.SUBTRACT)

    # 草图12 → 切除-拉伸14 (cut, two sides: drawn at the far end of the back side and taken through both)
    with BuildSketch(Plane(origin=(-4.6452924, 0, -51.743459523), x_dir=(0.9690505868068372, 0, -0.24686222920755765), z_dir=(0.24686222920755765, 0, 0.9690505868068372)).offset(-CUT_EXTRUDE_14_DEPTH_BACK)):
        with BuildLine():
            Line((14.939240455, 4), (14.939240455, 0))
            Line((14.939240455, 0), (18.939240455, 0))
            Line((18.939240455, 0), (18.939240455, 4))
            ThreePointArc((18.939240455, 4), (18.043596532, 4.510774109), (17.689240455, 5.479019946))
            Line((17.689240455, 5.479019946), (17.689240455, 5.633974596))
            ThreePointArc((17.689240455, 5.633974596), (17.823215052, 6.133974596), (18.189240455, 6.5))
            Line((18.189240455, 6.5), (18.189240455, 7))
            ThreePointArc((18.189240455, 7), (17.896347236, 7.707106781), (17.189240455, 8))
            Line((17.189240455, 8), (16.689240455, 8))
            ThreePointArc((16.689240455, 8), (15.982133674, 7.707106781), (15.689240455, 7))
            Line((15.689240455, 7), (15.689240455, 6.5))
            ThreePointArc((15.689240455, 6.5), (16.055265859, 6.133974596), (16.189240455, 5.633974596))
            Line((16.189240455, 5.633974596), (16.189240455, 5.479019946))
            ThreePointArc((16.189240455, 5.479019946), (15.834884379, 4.510774109), (14.939240455, 4))
        make_face()
    extrude(amount=CUT_EXTRUDE_14_DEPTH + CUT_EXTRUDE_14_DEPTH_BACK, mode=Mode.SUBTRACT)


with BuildPart() as body_2:
    # 镜向1: mirrored copy
    add(part_1.part.mirror(Plane(origin=(0, 0, 0), x_dir=(0, 0, 1), z_dir=(1, 0, 0))))


with BuildPart() as part_2:
    add(part_1.part)

    # 草图21 → 切除-拉伸15 (cut, through all)
    with BuildSketch(Plane(origin=(0, 0, 0), x_dir=(0, 0, -1), z_dir=(1, 0, 0))):
        with Locations((35.97624749, 0.882624133)):
            Rectangle(SKETCH_21_W, SKETCH_21_H)
    extrude(amount=CUT_EXTRUDE_15_DEPTH, mode=Mode.SUBTRACT)


solid = body_2.part
